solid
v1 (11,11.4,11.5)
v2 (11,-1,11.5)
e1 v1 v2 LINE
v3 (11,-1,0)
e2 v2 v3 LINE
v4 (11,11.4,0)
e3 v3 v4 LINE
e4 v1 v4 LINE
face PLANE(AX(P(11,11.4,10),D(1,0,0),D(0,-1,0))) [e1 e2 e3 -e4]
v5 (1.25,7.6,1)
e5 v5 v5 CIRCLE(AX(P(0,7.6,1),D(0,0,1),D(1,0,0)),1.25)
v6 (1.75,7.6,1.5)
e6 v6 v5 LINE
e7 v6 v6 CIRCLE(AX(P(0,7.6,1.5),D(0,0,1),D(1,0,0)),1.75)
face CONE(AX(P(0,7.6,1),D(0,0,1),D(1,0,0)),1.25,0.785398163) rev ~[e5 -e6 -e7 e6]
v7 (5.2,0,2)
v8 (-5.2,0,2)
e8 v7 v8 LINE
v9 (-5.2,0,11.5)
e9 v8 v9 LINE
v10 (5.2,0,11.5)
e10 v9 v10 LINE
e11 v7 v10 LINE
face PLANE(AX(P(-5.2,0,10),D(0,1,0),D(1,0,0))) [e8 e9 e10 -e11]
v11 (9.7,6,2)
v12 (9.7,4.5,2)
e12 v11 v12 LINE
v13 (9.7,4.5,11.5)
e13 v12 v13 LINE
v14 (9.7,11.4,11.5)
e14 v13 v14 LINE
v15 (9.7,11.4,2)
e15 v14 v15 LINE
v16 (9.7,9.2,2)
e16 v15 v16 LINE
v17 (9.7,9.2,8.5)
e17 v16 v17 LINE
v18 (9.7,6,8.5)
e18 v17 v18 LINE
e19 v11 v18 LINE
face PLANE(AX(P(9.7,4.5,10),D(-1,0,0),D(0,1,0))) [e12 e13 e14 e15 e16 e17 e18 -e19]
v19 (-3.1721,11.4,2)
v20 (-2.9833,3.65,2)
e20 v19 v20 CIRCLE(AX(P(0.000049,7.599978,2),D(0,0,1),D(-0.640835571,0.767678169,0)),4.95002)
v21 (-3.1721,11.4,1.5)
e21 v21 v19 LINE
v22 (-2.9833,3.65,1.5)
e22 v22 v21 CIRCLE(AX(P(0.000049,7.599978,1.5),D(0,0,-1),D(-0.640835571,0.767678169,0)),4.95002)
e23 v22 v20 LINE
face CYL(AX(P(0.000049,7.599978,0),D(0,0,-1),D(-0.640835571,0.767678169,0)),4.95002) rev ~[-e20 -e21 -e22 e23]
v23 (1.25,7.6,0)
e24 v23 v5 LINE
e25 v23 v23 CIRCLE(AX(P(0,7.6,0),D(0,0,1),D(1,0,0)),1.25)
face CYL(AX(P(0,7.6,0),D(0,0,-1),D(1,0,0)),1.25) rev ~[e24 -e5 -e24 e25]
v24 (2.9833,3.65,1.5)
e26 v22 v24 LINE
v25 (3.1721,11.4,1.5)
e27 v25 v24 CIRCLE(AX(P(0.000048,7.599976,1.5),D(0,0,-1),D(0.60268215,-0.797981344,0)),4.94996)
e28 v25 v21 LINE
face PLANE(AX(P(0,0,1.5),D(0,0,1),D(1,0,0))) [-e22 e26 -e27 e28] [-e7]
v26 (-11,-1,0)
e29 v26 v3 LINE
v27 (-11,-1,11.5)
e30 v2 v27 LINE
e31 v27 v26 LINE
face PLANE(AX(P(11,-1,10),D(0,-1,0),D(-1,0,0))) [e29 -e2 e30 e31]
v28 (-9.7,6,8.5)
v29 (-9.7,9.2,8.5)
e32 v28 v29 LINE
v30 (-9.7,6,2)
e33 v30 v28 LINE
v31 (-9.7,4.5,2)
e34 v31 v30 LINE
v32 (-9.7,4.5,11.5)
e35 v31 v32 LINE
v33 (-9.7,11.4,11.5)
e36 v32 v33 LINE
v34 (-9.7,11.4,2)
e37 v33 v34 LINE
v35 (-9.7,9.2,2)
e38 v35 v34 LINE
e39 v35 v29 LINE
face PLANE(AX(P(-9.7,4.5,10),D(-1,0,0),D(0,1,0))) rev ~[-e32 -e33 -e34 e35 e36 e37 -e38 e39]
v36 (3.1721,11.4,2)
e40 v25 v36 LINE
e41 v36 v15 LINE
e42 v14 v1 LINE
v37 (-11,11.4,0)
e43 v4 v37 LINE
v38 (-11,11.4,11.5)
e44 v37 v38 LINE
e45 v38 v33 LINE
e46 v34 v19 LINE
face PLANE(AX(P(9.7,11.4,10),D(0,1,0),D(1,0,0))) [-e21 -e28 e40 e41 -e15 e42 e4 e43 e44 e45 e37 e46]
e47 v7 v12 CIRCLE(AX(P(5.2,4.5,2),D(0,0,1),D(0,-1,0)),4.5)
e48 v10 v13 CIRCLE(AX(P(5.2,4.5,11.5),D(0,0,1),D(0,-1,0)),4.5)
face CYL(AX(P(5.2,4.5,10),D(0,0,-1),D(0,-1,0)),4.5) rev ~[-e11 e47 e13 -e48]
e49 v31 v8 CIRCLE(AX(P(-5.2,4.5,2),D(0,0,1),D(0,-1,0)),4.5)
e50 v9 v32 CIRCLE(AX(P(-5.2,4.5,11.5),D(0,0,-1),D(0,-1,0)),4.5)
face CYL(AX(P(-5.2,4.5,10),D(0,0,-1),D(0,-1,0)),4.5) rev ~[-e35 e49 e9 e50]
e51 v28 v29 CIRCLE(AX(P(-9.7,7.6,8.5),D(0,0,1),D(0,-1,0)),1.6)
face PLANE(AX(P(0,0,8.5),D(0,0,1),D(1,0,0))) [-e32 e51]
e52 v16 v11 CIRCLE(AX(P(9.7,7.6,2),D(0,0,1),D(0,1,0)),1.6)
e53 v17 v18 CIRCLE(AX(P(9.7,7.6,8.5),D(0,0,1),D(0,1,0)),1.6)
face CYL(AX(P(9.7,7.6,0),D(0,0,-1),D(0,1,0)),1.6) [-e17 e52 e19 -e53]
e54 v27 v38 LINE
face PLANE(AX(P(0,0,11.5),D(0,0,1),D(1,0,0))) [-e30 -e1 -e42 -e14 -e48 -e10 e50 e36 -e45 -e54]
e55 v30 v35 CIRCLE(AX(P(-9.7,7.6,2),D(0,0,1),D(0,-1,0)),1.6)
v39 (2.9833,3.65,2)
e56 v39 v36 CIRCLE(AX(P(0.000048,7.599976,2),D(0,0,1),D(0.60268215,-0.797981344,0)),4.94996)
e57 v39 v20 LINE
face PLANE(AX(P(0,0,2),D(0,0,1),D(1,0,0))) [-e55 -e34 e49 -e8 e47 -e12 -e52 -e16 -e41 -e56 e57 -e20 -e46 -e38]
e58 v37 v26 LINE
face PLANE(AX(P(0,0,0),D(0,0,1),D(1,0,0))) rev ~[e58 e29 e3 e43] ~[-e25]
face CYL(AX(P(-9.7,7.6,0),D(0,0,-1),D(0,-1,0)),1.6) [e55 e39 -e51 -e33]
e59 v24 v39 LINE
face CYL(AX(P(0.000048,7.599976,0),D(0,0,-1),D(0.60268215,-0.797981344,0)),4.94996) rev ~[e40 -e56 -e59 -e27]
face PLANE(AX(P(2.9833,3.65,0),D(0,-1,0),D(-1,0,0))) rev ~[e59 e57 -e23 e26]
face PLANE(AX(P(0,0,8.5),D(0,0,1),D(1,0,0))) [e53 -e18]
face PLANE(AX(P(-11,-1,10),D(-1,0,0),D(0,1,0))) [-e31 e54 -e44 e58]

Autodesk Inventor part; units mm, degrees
ref_plane "YZ Plane" through (0, 0, 0) normal (1, 0, 0) x (0, 1, 0)
ref_plane "XZ Plane" through (0, 0, 0) normal (0, 1, 0) x (-1, 0, 0)
ref_plane "XY Plane" through (0, 0, 0) normal (0, 0, 1) x (1, 0, 0)
sketch "Sketch1" plane through (0, 0, 0) normal (0, 0, 1) x (1, 0, 0)
  line L0 (9.7, 0) -> (-9.7, 0)
  line L1 (-9.7, 0) -> (-9.7, 11.4)
  line L2 (-9.7, 11.4) -> (9.7, 11.4)
  line L3 (9.7, 11.4) -> (9.7, 0)
  line L4 (-9.7, 6) -> (-9.7, 0)
  line L5 (-9.7, 0) -> (9.7, 0)
  line L6 (9.7, 0) -> (9.7, 6)
  arc A0 (-9.7, 6) -> (-9.7, 9.2) centre (-9.7, 7.6) ccw
  arc A1 (9.7, 9.2) -> (9.7, 6) centre (9.7, 7.6) ccw
  line L7 (6.5, 0) -> (-6.5, 0)
  line L8 (-6.5, 0) -> (-6.5, 3)
  line L9 (-6.5, 3) -> (6.5, 3)
  line L10 (6.5, 3) -> (6.5, 0)
  line L11 (2.9833, 3.65) -> (-2.9833, 3.65)
  line L12 (-3.1721, 11.4) -> (3.1721, 11.4)
  arc A2 (-3.1721, 11.4) -> (-2.9833, 3.65) centre (0, 7.6) ccw
  arc A3 (2.9833, 3.65) -> (3.1721, 11.4) centre (0, 7.6) ccw
  circle A4 centre (0, 7.6) radius 1.25
  line L13 (11, -1) -> (-11, -1)
  line L14 (-11, -1) -> (-11, 11.4)
  line L15 (-11, 11.4) -> (11, 11.4)
  line L16 (11, 11.4) -> (11, -1)
  point P0 (0, 0)
  dimension "d0" = 19.4
  dimension "d1" = 11.4
  dimension "d3" = 13
  dimension "d5" = 2.5
  dimension "d6" = 22
  dimension "d7" = 12.4
extrude "Extrusion1" add sketch "Sketch1" along normal blind 10 contours L3 L15 L16 L13 L14 L1 L0
extrude "Extrusion3" add sketch "Sketch1" along normal blind 8.5 contours A1 L3 | L1 A0
extrude "Extrusion4" add sketch "Sketch1" along normal blind 1.5 contours L0 L10 L9 L8 L1 A0 L2 A2 L11 A3 L3 A1 | L0 L8 L9 L10 | A3 L11 A2 L2
chamfer "Chamfer1" distance 0.5 angle 45 1 edges at (-1.25, 7.6, 1.5)
fillet "Fillet1" radius 4.5 2 edges at (-9.7, 0, 5.75) (9.7, 0, 5.75)
extrude "Extrusion6" add sketch "Sketch1" along normal blind 2 contours L0 L10 L9 L8 L1 A0 L2 A2 L11 A3 L3 A1 | L0 L8 L9 L10
move faces "Move1" translate (0, 0, 1.5) faces at (-1.7333, -0.6667, 10)
sketch "Sketch2" plane through (-11, -1, 0) normal (0, -1, 0) x (1, 0, 0)
  line L0 (22, 0) -> (22, 11.5) projected
  line L1 (0, 0) -> (22, 0)
  line L2 (22, 0) -> (22, 1)
  line L3 (22, 1) -> (0, 1)
  line L4 (0, 1) -> (0, 0)
  line L5 (5, 0) -> (4.6249, 0)
  line L6 (4.6249, 1) -> (5, 1)
  line L7 (0, 0) -> (22, 0) projected
  line L8 (17, 0) -> (17, 1)
  line L9 (5, 0) -> (5, 1)
  line L10 (1, 0) -> (1, 1)
  line L11 (21, 0) -> (21, 1)
  point P0 (11, 0)
  point P1 (0, 0.5)
  point P2 (4.9955, 0.5057)
  point P3 (5, 0.5)
  point P4 (21, 0.5)
  point P5 (1, 0)
  dimension "d28" = 1
  dimension "d30" = 5
  dimension "d31" = 5
  dimension "d32" = 1
  dimension "d33" = 1
extrude "Extrusion7" add sketch "Sketch2" along normal blind 1.5 contours L1 L11 L3 L0 | L1 L9 L3 L8 | L1 L4 L3 L10
move faces "Move2" translate (0, 1.5, 0) faces at (-10.6667, -2.5, 0.6667) (2, -2.5, 0.3333) (10.6667, -2.5, 0.6667)
properties part number "MotorHolder"
